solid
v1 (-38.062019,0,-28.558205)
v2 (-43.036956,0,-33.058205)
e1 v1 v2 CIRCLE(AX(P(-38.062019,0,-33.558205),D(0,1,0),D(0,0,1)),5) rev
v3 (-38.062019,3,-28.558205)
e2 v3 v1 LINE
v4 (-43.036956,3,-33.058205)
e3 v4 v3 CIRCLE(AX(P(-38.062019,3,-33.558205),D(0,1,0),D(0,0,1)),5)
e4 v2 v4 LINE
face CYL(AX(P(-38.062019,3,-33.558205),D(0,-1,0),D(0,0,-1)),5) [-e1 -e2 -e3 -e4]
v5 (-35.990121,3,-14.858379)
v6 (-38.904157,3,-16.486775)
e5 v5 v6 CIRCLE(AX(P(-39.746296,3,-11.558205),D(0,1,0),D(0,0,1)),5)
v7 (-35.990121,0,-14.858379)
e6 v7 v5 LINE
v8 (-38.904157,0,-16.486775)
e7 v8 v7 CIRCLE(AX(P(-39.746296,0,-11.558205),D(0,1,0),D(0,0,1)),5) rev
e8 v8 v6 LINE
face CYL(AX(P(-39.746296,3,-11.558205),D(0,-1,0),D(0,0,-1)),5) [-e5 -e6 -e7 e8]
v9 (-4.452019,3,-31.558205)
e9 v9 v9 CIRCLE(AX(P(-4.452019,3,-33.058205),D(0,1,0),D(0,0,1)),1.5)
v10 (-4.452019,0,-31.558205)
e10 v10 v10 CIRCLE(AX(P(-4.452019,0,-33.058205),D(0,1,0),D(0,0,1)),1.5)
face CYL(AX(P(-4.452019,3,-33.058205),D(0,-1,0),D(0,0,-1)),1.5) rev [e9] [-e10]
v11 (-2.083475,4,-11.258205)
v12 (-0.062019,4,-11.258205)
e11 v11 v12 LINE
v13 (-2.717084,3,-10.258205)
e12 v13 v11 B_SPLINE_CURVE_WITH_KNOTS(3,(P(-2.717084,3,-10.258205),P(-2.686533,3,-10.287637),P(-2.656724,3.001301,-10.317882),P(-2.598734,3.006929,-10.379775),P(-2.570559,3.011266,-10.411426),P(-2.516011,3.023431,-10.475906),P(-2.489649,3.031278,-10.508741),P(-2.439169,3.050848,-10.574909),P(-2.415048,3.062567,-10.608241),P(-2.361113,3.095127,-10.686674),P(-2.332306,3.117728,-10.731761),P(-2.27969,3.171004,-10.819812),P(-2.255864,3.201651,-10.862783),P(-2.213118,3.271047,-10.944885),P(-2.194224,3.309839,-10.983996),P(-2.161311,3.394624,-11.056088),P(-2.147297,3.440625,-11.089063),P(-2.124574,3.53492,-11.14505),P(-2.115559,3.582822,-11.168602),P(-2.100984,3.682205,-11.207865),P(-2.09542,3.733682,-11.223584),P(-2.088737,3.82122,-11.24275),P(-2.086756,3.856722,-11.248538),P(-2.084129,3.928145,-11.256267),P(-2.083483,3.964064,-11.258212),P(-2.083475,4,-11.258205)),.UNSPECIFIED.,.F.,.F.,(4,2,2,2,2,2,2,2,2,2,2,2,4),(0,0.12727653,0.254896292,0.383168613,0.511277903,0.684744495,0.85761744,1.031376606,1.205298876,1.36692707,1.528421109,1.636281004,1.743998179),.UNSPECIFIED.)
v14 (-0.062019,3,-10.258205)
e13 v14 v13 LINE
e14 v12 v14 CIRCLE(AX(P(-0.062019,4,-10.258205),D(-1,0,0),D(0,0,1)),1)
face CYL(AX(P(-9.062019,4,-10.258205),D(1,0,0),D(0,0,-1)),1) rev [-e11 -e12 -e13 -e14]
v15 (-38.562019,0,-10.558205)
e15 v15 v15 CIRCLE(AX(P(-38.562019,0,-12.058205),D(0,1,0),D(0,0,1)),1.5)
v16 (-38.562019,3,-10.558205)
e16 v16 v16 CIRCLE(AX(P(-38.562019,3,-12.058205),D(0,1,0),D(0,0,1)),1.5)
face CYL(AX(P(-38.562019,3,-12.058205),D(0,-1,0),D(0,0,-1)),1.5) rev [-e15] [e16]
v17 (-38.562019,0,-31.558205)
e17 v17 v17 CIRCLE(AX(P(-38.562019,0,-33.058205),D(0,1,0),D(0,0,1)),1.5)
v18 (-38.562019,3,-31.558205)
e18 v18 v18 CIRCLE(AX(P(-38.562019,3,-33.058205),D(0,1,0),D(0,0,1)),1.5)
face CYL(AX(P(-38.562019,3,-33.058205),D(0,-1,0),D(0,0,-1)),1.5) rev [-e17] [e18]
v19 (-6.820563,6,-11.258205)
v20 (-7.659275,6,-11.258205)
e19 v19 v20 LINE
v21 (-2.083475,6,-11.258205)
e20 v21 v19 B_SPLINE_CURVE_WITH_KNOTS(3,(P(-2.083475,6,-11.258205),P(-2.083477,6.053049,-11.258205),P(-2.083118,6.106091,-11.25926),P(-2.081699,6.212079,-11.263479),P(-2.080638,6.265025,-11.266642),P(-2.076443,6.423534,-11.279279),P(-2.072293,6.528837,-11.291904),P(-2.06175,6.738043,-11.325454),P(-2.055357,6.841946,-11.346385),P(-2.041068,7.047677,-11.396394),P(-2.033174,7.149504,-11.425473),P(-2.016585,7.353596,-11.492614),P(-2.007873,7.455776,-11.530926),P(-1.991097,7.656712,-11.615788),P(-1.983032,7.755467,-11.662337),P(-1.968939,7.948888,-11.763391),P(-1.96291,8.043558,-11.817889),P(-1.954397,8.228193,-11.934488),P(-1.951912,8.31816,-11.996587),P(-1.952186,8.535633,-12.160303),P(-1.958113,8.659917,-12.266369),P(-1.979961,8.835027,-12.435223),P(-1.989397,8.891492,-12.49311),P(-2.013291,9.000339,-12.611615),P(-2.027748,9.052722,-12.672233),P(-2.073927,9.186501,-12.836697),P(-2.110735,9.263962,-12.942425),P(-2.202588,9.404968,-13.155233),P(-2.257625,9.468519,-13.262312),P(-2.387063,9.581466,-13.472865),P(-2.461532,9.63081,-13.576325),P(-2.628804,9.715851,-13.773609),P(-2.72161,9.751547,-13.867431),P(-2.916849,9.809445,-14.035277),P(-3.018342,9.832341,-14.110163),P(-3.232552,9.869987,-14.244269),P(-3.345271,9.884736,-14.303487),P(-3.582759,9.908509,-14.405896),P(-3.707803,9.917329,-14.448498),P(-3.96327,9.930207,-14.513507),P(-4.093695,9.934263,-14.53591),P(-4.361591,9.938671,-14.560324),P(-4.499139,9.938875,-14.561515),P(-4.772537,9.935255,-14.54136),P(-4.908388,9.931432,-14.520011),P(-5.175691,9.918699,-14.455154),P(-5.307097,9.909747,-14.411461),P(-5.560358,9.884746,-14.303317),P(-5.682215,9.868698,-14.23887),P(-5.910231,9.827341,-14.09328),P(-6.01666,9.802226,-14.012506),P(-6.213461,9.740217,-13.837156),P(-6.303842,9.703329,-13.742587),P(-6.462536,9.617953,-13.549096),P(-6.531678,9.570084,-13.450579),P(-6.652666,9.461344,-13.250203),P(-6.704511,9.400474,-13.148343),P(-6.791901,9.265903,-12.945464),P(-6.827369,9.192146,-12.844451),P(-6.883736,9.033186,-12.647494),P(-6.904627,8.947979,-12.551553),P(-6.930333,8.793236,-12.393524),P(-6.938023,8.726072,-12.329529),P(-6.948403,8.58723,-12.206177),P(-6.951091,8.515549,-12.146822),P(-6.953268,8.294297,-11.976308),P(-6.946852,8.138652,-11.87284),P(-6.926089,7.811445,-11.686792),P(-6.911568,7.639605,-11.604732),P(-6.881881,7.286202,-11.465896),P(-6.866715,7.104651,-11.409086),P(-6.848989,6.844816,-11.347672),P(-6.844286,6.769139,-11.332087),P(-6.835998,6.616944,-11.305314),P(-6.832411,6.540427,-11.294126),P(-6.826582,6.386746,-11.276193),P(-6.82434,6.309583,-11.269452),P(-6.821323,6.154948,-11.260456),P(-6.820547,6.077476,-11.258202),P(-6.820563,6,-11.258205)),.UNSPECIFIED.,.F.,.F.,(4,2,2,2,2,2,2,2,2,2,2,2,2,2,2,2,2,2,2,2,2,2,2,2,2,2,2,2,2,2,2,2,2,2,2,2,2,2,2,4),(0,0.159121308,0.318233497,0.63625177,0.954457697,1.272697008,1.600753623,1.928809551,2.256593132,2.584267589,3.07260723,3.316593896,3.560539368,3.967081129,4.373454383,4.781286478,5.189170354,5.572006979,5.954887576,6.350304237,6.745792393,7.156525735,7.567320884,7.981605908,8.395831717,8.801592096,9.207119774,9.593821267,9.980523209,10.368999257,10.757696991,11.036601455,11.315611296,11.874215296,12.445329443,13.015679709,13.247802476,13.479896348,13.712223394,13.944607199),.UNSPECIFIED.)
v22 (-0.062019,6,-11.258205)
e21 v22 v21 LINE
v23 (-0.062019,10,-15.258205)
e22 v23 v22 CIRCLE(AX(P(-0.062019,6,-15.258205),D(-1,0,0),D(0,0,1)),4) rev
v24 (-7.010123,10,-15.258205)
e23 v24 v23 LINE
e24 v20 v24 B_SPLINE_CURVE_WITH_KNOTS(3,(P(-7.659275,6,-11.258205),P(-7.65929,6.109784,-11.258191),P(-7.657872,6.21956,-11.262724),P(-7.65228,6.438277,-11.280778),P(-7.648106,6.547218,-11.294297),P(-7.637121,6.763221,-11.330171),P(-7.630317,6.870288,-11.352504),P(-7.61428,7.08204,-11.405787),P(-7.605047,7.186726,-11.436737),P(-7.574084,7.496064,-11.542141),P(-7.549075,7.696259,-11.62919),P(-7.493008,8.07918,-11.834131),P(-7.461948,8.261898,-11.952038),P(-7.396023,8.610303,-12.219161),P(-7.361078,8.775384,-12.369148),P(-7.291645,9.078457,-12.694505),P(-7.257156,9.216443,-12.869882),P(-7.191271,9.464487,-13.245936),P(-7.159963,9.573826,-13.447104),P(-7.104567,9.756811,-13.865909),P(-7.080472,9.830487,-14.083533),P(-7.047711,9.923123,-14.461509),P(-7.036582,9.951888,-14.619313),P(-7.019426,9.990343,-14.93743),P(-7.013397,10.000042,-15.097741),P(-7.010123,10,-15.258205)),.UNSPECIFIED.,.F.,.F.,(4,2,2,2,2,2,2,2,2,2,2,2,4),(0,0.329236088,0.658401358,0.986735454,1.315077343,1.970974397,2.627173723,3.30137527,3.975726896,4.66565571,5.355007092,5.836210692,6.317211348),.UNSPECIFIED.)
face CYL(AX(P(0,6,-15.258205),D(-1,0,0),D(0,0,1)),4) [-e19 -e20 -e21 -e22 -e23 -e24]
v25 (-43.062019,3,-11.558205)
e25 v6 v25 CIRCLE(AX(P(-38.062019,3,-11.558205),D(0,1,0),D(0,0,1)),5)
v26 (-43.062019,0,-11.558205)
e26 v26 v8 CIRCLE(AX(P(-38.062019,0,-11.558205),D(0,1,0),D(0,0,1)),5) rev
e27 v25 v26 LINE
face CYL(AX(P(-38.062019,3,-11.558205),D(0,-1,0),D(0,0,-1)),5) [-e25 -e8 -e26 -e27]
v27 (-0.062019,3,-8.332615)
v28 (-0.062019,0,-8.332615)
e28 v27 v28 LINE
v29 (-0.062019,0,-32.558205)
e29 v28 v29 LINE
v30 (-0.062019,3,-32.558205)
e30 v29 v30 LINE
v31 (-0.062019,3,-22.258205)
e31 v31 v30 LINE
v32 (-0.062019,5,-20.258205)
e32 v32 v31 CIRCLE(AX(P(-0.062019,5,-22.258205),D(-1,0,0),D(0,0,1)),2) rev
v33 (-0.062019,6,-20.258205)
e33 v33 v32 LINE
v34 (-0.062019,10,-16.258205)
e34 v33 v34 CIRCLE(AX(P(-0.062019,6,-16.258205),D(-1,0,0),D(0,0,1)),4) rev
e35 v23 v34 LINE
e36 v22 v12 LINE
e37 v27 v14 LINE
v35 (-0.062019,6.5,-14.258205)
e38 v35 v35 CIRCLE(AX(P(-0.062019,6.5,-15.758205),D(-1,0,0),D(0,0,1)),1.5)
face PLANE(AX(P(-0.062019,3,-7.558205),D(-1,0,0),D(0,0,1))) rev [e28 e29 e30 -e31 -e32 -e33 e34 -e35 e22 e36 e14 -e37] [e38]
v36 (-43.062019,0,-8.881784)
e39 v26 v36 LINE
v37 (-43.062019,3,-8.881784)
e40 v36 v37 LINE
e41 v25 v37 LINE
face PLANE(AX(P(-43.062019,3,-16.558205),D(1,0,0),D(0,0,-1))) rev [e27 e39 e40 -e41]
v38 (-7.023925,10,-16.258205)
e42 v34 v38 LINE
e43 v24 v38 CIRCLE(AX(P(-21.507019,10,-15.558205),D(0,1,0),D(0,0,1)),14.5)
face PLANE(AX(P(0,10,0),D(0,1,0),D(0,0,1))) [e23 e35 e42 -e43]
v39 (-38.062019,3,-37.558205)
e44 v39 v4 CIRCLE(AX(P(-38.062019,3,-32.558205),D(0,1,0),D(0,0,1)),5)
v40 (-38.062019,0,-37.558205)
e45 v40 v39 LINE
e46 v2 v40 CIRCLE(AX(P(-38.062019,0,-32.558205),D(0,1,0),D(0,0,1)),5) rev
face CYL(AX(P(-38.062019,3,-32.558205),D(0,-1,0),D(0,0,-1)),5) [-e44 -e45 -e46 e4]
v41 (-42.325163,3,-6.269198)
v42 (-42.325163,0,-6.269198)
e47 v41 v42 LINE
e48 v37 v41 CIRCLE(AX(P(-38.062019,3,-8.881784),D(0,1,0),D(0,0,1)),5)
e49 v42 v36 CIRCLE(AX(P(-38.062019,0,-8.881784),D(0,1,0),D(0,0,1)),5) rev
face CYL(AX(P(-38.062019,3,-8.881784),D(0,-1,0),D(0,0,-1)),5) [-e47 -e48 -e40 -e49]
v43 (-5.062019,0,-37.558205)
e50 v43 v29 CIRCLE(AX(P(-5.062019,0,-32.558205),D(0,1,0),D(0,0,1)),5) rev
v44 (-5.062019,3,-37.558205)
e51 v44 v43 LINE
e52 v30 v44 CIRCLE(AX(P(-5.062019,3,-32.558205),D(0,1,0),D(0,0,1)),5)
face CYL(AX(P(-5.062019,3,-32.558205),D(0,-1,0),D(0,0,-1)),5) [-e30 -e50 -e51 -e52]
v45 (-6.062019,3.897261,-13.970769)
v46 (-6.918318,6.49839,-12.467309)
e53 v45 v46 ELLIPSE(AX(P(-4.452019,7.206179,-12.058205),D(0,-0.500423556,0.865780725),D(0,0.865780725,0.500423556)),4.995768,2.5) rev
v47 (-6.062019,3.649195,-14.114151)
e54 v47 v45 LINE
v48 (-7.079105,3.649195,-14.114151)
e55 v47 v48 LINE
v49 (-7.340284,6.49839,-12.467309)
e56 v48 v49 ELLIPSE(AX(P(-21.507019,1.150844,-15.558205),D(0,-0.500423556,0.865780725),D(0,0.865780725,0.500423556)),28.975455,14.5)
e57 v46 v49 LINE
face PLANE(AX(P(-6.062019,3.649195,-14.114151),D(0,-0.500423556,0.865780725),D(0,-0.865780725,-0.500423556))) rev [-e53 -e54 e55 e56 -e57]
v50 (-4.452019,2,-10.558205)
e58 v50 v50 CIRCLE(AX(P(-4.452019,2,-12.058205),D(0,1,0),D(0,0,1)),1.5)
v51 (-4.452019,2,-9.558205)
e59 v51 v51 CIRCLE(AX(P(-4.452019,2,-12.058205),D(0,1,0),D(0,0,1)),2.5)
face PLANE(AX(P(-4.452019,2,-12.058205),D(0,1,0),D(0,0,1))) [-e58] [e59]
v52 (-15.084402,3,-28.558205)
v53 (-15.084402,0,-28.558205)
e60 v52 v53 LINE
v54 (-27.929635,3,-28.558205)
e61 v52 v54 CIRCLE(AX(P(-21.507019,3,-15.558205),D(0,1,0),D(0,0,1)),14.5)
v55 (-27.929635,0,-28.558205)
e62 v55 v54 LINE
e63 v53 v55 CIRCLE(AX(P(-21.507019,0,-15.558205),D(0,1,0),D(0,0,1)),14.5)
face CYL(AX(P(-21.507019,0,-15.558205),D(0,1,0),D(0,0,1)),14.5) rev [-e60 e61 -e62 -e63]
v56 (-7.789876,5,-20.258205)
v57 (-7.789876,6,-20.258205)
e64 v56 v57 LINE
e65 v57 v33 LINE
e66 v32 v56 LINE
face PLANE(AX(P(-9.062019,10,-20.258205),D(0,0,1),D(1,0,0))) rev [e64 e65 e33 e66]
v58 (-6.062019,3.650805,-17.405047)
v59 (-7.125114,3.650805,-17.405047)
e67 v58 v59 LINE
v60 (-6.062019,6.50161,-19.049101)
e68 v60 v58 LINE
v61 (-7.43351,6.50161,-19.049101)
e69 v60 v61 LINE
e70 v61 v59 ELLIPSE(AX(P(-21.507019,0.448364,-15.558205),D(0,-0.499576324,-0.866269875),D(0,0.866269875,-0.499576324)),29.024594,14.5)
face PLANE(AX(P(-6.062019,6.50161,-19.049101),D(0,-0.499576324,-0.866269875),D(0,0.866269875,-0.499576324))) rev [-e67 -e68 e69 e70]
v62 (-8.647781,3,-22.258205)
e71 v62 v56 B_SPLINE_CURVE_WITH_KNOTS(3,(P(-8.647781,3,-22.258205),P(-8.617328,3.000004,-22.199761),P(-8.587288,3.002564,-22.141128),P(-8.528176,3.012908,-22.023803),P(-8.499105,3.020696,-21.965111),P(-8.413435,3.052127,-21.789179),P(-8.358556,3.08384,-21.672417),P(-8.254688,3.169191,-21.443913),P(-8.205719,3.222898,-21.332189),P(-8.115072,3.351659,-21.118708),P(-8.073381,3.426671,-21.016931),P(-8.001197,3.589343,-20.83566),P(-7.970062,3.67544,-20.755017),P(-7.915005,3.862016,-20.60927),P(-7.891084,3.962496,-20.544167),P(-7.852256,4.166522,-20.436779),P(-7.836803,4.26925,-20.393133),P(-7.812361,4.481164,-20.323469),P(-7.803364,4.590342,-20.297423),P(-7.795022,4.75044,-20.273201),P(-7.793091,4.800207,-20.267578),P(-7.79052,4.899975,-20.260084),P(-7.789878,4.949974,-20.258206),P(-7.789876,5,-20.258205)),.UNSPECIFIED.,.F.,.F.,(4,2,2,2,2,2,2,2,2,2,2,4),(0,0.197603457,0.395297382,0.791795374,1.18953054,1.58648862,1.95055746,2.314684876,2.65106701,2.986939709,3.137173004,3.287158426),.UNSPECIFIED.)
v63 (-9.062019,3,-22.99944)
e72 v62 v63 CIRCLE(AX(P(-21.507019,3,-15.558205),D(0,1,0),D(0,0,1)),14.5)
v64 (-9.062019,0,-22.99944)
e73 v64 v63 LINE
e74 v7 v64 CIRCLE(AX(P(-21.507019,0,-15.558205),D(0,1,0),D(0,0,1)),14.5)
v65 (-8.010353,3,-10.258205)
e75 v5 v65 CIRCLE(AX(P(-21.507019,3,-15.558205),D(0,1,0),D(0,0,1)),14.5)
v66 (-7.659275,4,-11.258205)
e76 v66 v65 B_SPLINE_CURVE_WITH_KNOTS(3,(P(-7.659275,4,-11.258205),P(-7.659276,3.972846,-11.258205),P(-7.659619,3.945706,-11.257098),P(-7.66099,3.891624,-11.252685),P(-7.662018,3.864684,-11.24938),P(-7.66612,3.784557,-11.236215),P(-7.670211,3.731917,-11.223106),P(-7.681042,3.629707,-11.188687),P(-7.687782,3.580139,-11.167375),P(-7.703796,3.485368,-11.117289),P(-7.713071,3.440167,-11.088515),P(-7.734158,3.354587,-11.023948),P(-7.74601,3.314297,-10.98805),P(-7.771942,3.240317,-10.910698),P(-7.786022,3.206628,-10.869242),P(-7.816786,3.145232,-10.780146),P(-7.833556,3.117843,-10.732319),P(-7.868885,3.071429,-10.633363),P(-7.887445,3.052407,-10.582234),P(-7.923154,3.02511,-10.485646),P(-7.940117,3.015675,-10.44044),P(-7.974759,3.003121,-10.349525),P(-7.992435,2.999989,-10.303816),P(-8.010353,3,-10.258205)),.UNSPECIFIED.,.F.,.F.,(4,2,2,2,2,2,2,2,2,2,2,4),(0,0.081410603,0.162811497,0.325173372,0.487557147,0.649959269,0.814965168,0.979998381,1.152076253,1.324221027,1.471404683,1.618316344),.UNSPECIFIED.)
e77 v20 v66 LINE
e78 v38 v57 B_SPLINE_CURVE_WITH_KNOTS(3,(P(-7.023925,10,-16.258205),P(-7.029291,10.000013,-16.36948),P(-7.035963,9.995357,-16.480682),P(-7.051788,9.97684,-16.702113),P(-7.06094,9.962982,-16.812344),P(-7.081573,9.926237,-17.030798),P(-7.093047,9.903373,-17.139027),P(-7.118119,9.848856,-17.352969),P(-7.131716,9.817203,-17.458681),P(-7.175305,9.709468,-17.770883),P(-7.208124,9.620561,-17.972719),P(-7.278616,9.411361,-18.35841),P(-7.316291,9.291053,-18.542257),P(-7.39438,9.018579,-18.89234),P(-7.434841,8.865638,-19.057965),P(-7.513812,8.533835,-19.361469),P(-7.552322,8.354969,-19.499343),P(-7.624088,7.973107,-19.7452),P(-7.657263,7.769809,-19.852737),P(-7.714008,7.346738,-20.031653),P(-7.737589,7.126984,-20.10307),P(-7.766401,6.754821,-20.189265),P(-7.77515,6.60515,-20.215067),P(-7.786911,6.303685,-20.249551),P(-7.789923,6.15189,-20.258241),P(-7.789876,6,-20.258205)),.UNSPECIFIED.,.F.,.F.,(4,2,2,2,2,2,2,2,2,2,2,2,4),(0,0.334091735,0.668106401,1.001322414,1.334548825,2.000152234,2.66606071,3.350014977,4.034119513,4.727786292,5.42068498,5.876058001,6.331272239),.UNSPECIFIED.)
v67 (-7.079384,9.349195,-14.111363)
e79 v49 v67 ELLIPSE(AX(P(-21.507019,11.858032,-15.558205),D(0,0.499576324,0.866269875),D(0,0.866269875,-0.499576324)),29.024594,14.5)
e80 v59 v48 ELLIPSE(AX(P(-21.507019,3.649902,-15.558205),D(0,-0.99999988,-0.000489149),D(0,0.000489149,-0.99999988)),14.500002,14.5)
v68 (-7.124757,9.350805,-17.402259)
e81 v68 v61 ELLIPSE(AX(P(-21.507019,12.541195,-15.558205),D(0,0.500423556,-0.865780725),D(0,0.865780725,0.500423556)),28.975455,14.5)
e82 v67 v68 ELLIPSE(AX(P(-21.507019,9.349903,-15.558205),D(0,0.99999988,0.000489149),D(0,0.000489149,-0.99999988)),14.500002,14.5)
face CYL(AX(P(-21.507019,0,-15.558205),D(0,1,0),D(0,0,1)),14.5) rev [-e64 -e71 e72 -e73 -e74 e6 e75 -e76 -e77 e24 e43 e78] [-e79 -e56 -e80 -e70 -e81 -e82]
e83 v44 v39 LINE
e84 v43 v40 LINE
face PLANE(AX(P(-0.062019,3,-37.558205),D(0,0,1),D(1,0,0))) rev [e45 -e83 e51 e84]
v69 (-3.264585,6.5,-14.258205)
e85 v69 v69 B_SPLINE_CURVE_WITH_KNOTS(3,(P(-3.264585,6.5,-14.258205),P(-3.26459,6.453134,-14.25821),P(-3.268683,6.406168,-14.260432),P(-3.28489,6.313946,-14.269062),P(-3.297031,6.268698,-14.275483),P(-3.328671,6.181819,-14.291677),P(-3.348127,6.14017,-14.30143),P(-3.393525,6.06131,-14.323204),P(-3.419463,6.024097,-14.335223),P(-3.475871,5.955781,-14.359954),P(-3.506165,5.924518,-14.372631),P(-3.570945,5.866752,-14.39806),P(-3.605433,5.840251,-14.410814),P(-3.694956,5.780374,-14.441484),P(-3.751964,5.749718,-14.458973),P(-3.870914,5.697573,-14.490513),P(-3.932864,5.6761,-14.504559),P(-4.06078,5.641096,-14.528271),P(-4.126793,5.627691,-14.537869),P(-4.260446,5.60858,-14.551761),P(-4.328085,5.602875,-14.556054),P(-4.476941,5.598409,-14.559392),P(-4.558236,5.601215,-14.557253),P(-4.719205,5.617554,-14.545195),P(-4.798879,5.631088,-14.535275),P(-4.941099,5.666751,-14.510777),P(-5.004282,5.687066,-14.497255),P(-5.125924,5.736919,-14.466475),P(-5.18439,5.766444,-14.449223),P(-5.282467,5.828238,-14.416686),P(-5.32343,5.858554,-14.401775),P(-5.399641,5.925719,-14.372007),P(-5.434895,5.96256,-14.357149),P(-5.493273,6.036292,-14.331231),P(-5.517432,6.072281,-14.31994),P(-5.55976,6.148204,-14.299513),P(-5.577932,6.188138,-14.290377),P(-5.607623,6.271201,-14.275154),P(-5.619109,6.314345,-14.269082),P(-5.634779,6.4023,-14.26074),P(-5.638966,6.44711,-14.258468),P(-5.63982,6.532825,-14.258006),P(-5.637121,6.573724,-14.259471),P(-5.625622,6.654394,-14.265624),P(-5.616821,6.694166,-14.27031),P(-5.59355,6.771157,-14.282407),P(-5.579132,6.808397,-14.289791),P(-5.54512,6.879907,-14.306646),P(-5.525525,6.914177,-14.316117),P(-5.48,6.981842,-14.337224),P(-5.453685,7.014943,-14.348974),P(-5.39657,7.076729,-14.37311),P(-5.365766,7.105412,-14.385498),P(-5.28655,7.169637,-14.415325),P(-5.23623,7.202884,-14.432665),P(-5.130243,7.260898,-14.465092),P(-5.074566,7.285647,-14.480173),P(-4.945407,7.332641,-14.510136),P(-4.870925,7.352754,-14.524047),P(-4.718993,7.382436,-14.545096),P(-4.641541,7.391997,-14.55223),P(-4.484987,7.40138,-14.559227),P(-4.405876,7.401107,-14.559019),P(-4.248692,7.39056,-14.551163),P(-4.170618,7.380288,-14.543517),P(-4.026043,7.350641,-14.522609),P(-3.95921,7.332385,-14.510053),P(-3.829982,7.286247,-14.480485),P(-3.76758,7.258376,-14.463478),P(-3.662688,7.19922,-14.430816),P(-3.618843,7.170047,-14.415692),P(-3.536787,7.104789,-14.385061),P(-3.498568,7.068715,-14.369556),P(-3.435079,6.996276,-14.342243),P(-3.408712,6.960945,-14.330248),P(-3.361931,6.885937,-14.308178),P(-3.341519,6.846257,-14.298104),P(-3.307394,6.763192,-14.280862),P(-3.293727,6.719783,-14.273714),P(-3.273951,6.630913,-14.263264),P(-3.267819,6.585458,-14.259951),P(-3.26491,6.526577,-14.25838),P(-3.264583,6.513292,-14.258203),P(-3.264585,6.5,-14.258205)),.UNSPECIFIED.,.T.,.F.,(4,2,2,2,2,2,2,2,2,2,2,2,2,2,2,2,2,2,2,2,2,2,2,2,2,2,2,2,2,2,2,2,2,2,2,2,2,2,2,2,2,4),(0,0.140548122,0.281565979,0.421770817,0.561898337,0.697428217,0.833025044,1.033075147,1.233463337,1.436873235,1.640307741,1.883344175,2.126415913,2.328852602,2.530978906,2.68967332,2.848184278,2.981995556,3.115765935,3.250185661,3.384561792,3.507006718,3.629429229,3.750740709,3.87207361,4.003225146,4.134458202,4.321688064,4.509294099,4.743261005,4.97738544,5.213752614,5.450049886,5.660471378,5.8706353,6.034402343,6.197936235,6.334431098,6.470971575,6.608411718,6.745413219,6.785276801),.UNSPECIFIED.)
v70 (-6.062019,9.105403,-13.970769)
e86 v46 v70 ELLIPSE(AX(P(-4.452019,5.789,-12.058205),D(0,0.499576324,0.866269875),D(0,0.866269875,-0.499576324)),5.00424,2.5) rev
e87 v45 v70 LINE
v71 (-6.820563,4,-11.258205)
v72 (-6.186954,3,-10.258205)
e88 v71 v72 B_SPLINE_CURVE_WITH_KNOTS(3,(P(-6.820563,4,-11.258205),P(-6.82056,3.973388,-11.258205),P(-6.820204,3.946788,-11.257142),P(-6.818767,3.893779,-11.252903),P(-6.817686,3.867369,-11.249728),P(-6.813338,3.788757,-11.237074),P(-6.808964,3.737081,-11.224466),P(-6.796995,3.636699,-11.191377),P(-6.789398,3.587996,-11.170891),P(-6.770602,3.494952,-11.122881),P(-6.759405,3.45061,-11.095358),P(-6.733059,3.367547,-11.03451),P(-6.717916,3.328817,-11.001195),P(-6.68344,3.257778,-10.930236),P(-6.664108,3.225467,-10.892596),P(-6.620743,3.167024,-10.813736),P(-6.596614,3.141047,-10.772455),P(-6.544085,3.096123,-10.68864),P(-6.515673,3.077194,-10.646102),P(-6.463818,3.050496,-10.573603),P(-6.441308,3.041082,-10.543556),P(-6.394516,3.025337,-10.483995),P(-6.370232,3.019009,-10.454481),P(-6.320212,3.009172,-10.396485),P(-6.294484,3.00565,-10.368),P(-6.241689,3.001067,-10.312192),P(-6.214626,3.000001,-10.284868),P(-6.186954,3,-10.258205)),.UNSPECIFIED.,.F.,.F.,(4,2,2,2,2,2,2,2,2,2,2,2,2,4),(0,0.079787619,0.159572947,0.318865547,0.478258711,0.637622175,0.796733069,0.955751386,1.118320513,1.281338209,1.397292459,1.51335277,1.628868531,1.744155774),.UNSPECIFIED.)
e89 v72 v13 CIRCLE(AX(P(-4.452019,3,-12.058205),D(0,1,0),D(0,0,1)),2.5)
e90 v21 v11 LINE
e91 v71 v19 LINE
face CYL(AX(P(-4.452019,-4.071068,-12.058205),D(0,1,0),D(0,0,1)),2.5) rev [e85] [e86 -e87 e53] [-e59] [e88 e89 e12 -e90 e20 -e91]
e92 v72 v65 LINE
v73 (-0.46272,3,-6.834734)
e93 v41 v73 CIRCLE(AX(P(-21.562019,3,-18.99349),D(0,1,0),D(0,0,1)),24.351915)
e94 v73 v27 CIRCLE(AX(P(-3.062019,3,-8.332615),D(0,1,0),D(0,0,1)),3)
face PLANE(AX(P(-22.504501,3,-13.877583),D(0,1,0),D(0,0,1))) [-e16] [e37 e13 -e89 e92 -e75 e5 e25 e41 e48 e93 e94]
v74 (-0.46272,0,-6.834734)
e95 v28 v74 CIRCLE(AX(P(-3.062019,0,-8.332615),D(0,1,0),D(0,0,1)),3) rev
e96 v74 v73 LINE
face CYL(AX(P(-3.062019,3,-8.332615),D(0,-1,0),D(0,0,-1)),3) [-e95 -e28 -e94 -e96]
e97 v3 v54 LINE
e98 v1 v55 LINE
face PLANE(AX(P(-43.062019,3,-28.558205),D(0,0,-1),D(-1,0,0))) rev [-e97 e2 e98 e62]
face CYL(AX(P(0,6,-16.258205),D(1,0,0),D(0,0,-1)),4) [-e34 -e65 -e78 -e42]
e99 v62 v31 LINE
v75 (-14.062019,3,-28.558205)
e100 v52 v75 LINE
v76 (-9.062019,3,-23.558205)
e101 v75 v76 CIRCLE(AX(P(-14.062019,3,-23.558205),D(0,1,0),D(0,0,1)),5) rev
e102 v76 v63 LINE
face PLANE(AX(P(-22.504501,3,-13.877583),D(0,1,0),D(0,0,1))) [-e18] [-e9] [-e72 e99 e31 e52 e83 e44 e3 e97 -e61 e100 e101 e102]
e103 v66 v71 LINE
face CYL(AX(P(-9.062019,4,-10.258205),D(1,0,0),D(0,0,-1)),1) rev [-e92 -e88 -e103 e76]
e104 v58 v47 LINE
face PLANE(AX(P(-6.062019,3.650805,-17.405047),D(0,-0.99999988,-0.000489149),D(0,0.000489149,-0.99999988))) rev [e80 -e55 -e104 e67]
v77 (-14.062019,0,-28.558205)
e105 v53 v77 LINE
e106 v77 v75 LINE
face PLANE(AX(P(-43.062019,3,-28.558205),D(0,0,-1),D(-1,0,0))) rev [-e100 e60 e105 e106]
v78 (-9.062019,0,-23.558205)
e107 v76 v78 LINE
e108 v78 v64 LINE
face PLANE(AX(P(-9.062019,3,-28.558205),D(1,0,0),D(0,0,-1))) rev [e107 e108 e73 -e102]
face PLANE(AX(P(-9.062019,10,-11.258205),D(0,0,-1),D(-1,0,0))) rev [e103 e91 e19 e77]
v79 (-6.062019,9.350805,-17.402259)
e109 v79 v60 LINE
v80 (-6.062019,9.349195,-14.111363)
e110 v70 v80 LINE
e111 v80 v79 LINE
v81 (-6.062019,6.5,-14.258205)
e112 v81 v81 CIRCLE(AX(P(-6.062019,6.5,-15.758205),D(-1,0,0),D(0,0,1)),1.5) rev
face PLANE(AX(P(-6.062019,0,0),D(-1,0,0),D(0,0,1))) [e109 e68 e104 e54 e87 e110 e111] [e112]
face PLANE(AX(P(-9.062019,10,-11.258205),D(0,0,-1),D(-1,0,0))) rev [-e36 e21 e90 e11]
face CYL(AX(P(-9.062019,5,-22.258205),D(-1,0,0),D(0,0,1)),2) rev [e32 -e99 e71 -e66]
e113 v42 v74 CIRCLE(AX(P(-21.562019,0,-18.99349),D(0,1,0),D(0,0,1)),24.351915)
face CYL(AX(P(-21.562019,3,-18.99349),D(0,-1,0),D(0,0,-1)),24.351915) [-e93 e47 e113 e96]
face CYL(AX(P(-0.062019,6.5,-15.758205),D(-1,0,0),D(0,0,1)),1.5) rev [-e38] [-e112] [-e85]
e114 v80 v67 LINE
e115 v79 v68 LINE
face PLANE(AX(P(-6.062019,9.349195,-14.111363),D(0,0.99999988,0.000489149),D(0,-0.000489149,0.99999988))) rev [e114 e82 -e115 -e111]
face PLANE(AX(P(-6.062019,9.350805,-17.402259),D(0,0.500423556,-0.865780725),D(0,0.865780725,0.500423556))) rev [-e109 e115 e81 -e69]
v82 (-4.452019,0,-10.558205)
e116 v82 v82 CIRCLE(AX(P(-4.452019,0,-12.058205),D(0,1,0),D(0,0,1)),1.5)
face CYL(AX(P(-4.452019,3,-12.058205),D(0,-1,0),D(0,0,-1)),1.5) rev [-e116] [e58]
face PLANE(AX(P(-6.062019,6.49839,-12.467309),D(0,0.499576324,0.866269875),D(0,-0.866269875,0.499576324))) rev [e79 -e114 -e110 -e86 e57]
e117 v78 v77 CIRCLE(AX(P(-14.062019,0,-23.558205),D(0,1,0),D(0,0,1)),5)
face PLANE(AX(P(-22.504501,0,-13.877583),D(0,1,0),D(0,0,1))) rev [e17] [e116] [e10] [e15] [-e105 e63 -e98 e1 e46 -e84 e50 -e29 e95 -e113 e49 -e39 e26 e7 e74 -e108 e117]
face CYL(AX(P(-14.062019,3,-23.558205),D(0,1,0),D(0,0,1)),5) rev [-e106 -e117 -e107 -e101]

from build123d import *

# Parameters (mm, degrees)
ESQUISSE1_R                  = 1.5
BOSS_EXTRU_1_DEPTH           = 3
CONG_1_R                     = 5
ESQUISSE2_W                  = 9
ESQUISSE2_H                  = 9
BOSS_EXTRU_2_DEPTH           = 7
ESQUISSE3_R                  = 2.5
ENL_V_MAT_EXTRU_1_DEPTH      = 7
ESQUISSE6_R                  = 1.5
ENL_V_MAT_EXTRU_2_DEPTH      = 52.639313998
ENL_V_MAT_EXTRU_3_DEPTH      = 3
CONG_2_R                     = 5
CONG_5_R                     = 2
CONG_7_R                     = 4
CONG_8_R                     = 4
CONG_10_R                    = 1
CONG_11_R                    = 3
ESQUISSE8_R                  = 2.5
ENL_V_MAT_EXTRU_4_DEPTH      = 1
ENL_V_MAT_EXTRU_5_DEPTH      = 58.566971538
ENL_V_MAT_EXTRU_5_DEPTH_BACK = 58.566971538
ESQUISSE9_R                  = 14.5


# Some blends are built 0.0001 mm under size
with BuildPart() as part:
    # Esquisse1 → Boss.-Extru.1 (new body)
    with BuildSketch(Plane(origin=(0, 0, 0), x_dir=(1, 0, 0), z_dir=(0, 1, 0))):
        with BuildLine():
            Line((-43.062018769, 37.558204832), (-43.062018769, 28.558204832))
            Line((-43.062018769, 28.558204832), (-9.062018769, 28.558204832))
            Line((-9.062018769, 28.558204832), (-9.062018769, 16.558204832))
            Line((-9.062018769, 16.558204832), (-10.400687943, 16.558204832))
            ThreePointArc((-10.400687943, 16.558204832), (-22.504500987, 1.48048564), (-34.608314032, 16.558204832))
            Line((-34.608314032, 16.558204832), (-43.062018769, 16.558204832))
            Line((-43.062018769, 16.558204832), (-43.062018769, 7.558204832))
            ThreePointArc((-43.062018769, 7.558204832), (-21.562018769, -5.358424695), (-0.062018769, 7.558204832))
            Line((-0.062018769, 7.558204832), (-0.062018769, 37.558204832))
            Line((-0.062018769, 37.558204832), (-43.062018769, 37.558204832))
        make_face()
        with Locations(Location((-38.562018769, 33.058204832, 0), (0, 0, 270))):
            Circle(ESQUISSE1_R, mode=Mode.SUBTRACT)
        with Locations(Location((-4.452018769, 33.058204832, 0), (0, 0, 270))):
            Circle(ESQUISSE1_R, mode=Mode.SUBTRACT)
        with Locations(Location((-38.562018769, 12.058204832, 0), (0, 0, 270))):
            Circle(ESQUISSE1_R, mode=Mode.SUBTRACT)
        with Locations(Location((-4.452018769, 12.058204832, 0), (0, 0, 270))):
            Circle(ESQUISSE1_R, mode=Mode.SUBTRACT)
    extrude(amount=BOSS_EXTRU_1_DEPTH)

    # Congé1
    # the kernel refuses this fillet: 5 mm, written as the material it takes off along each edge
    with BuildSketch(Plane(origin=(-10.400687943, -7.42198732, -16.558204832), x_dir=(1, 0, 0), z_dir=(0, 1, 0))) as cong_1_piece_1:
        with BuildLine():
            CenterArc((5.289036165, -3.065061278), CONG_1_R, 142.192371197, 36.541408835)
            Line((0.290257108, -2.954571735), (0.190281527, -2.952361944))
            ThreePointArc((0.190281527, -2.952361944), (0.1343702, -1.478342768), (-0.09763425, -0.021622979))
            Line((-0.09763425, -0.021622979), (0, 0.1))
            ThreePointArc((0, 0.1), (0.669334587, 0.1), (1.259661834, 0.061301226))
            Line((1.259661834, 0.061301226), (1.338669174, 0))
        make_face()
    extrude(amount=17.84397464, mode=Mode.SUBTRACT)
    with BuildSketch(Plane(origin=(-34.608314032, -12.844953969, -16.558204832), x_dir=(-0.04210418762599367, 0, 0.9991132255076776), z_dir=(0, 1, 0))) as cong_1_piece_2:
        with BuildLine():
            CenterArc((5.211896668, -4.922904418), CONG_1_R, 100.074581009, 82.338524577)
            Line((0.216330541, -5.133425356), (0.116419218, -5.137635775))
            Line((0.116419218, -5.137635775), (-0.099911323, -0.004210419))
            Line((-0.099911323, -0.004210419), (0.017492994, 0.098458088))
            ThreePointArc((0.017492994, 0.098458088), (2.168623487, -0.091152287), (4.31975398, 0.098458088))
            Line((4.31975398, 0.098458088), (4.337246974, 0))
        make_face()
    extrude(amount=28.689907938, mode=Mode.SUBTRACT)
    with BuildSketch(Plane(origin=(-43.062018769, -12.5, -37.558204832), x_dir=(0, 0, 1), z_dir=(0, 1, 0))) as cong_1_piece_3:
        with BuildLine():
            CenterArc((CONG_1_R, CONG_1_R), CONG_1_R, 180, 90)
            Line((0, CONG_1_R), (-CONG_1_R * 0.02, CONG_1_R))
            Line((-CONG_1_R * 0.02, CONG_1_R), (-CONG_1_R * 0.02, -CONG_1_R * 0.02))
            Line((-CONG_1_R * 0.02, -CONG_1_R * 0.02), (CONG_1_R, -CONG_1_R * 0.02))
            Line((CONG_1_R, -CONG_1_R * 0.02), (CONG_1_R, 0))
        make_face()
    extrude(amount=28, mode=Mode.SUBTRACT)
    with BuildSketch(Plane(origin=(-43.062018769, -12.5, -28.558204832), x_dir=(0, 0, -1), z_dir=(0, 1, 0)), Plane(origin=(-43.062018769, -12.5, -16.558204832), x_dir=(1, 0, 0), z_dir=(0, 1, 0))) as cong_1_piece_4:
        with BuildLine():
            CenterArc((CONG_1_R, -CONG_1_R), CONG_1_R, 90, 90)
            Line((0, -CONG_1_R), (-CONG_1_R * 0.02, -CONG_1_R))
            Line((-CONG_1_R * 0.02, -CONG_1_R), (-CONG_1_R * 0.02, CONG_1_R * 0.02))
            Line((-CONG_1_R * 0.02, CONG_1_R * 0.02), (CONG_1_R, CONG_1_R * 0.02))
            Line((CONG_1_R, CONG_1_R * 0.02), (CONG_1_R, 0))
        make_face()
    extrude(amount=28, mode=Mode.SUBTRACT)
    with BuildSketch(Plane(origin=(-43.062018769, -3.711884718, -7.558204832), x_dir=(0, 0, -1), z_dir=(0, 1, 0))) as cong_1_piece_5:
        with BuildLine():
            CenterArc((1.32357905, -5), CONG_1_R, 90, 31.501244596)
            Line((-1.28900638, -0.736855929), (-1.341258088, -0.651593047))
            ThreePointArc((-1.341258088, -0.651593047), (-0.699748478, -0.271785559), (-0.046958464, 0.088288746))
            Line((-0.046958464, 0.088288746), (0, 0.1))
            Line((0, 0.1), (1.32357905, 0.1))
            Line((1.32357905, 0.1), (1.32357905, 0))
        make_face()
    extrude(amount=10.423769437, mode=Mode.SUBTRACT)

    # Esquisse2 → Boss.-Extru.2 (add)
    with BuildSketch(Plane(origin=(0, 3, 0), x_dir=(1, 0, 0), z_dir=(0, 1, 0))):
        with Locations((-4.562018769, 15.758204832)):
            Rectangle(ESQUISSE2_W, ESQUISSE2_H)
    extrude(amount=BOSS_EXTRU_2_DEPTH)

    # Esquisse3 → Enlèv. mat.-Extru.1 (cut)
    with BuildSketch(Plane(origin=(0, 10, 0), x_dir=(1, 0, 0), z_dir=(0, 1, 0))):
        with Locations((-4.452018769, 12.058204832)):
            Circle(ESQUISSE3_R)
    extrude(amount=-ENL_V_MAT_EXTRU_1_DEPTH, mode=Mode.SUBTRACT)

    # Esquisse6 → Enlèv. mat.-Extru.2 (cut, through all)
    with BuildSketch(Plane.ZY.offset(9.062018769)):
        with Locations((-15.758204832, 6.5)):
            Circle(ESQUISSE6_R)
    extrude(amount=-ENL_V_MAT_EXTRU_2_DEPTH, mode=Mode.SUBTRACT)

    # Esquisse7 → Enlèv. mat.-Extru.3 (cut)
    with BuildSketch(Plane.ZY.offset(9.062018769)):
        Polygon((-14.114150837, 3.649195471), (-12.467308691, 6.49839026), (-14.111362685, 9.349194789), (-17.402258826, 9.350804529), (-19.049100972, 6.50160974), (-17.405046978, 3.650805211), align=None)
    extrude(amount=-ENL_V_MAT_EXTRU_3_DEPTH, mode=Mode.SUBTRACT)

    # Congé2
    cong_2_edges = [part.edges().sort_by_distance(p)[0] for p in [
        (-0.062018769, 1.5, -37.558204832),
        (-9.062018769, 1.5, -28.558204832),
    ]]
    fillet(cong_2_edges, radius=CONG_2_R)

    # Congé5
    cong_5_edges = [part.edges().sort_by_distance(p)[0] for p in [
        (-4.562018769, 3, -20.258204832),
    ]]
    fillet(cong_5_edges, radius=CONG_5_R)

    # Congé7
    cong_7_edges = [part.edges().sort_by_distance(p)[0] for p in [
        (-4.562018769, 10, -20.258204832),
    ]]
    fillet(cong_7_edges, radius=CONG_7_R)

    # Congé8
    cong_8_edges = [part.edges().sort_by_distance(p)[0] for p in [
        (-7.941290697, 10, -11.258204832),
    ]]
    fillet(cong_8_edges, radius=CONG_8_R - 0.0001)  # a hair under: the kernel refuses the full size

    # Congé10
    cong_10_edges = [part.edges().sort_by_distance(p)[0] for p in [
        (-7.941290697, 3, -11.258204832),
        (-1.072746841, 3, -11.258204832),
    ]]
    fillet(cong_10_edges, radius=CONG_10_R)

    # Congé11
    cong_11_edges = [part.edges().sort_by_distance(p)[0] for p in [
        (-0.062018769, 1.5, -7.558204832),
    ]]
    fillet(cong_11_edges, radius=CONG_11_R)

    # Esquisse8 → Enlèv. mat.-Extru.4 (cut)
    with BuildSketch(Plane(origin=(0, 3, 0), x_dir=(1, 0, 0), z_dir=(0, 1, 0))):
        with Locations(Location((-4.452018769, 12.058204832, 0), (0, 0, 270))):
            Circle(ESQUISSE8_R)
    extrude(amount=-ENL_V_MAT_EXTRU_4_DEPTH, mode=Mode.SUBTRACT)

    # Esquisse9 → Enlèv. mat.-Extru.5 (cut, two sides: drawn at the far end of the back side and taken through both)
    with BuildSketch(Plane(origin=(0, 3, 0), x_dir=(1, 0, 0), z_dir=(0, 1, 0)).offset(-ENL_V_MAT_EXTRU_5_DEPTH_BACK)):
        with Locations((-21.507018769, 15.558204832)):
            Circle(ESQUISSE9_R)
    extrude(amount=ENL_V_MAT_EXTRU_5_DEPTH + ENL_V_MAT_EXTRU_5_DEPTH_BACK, mode=Mode.SUBTRACT)


solid = part.part
